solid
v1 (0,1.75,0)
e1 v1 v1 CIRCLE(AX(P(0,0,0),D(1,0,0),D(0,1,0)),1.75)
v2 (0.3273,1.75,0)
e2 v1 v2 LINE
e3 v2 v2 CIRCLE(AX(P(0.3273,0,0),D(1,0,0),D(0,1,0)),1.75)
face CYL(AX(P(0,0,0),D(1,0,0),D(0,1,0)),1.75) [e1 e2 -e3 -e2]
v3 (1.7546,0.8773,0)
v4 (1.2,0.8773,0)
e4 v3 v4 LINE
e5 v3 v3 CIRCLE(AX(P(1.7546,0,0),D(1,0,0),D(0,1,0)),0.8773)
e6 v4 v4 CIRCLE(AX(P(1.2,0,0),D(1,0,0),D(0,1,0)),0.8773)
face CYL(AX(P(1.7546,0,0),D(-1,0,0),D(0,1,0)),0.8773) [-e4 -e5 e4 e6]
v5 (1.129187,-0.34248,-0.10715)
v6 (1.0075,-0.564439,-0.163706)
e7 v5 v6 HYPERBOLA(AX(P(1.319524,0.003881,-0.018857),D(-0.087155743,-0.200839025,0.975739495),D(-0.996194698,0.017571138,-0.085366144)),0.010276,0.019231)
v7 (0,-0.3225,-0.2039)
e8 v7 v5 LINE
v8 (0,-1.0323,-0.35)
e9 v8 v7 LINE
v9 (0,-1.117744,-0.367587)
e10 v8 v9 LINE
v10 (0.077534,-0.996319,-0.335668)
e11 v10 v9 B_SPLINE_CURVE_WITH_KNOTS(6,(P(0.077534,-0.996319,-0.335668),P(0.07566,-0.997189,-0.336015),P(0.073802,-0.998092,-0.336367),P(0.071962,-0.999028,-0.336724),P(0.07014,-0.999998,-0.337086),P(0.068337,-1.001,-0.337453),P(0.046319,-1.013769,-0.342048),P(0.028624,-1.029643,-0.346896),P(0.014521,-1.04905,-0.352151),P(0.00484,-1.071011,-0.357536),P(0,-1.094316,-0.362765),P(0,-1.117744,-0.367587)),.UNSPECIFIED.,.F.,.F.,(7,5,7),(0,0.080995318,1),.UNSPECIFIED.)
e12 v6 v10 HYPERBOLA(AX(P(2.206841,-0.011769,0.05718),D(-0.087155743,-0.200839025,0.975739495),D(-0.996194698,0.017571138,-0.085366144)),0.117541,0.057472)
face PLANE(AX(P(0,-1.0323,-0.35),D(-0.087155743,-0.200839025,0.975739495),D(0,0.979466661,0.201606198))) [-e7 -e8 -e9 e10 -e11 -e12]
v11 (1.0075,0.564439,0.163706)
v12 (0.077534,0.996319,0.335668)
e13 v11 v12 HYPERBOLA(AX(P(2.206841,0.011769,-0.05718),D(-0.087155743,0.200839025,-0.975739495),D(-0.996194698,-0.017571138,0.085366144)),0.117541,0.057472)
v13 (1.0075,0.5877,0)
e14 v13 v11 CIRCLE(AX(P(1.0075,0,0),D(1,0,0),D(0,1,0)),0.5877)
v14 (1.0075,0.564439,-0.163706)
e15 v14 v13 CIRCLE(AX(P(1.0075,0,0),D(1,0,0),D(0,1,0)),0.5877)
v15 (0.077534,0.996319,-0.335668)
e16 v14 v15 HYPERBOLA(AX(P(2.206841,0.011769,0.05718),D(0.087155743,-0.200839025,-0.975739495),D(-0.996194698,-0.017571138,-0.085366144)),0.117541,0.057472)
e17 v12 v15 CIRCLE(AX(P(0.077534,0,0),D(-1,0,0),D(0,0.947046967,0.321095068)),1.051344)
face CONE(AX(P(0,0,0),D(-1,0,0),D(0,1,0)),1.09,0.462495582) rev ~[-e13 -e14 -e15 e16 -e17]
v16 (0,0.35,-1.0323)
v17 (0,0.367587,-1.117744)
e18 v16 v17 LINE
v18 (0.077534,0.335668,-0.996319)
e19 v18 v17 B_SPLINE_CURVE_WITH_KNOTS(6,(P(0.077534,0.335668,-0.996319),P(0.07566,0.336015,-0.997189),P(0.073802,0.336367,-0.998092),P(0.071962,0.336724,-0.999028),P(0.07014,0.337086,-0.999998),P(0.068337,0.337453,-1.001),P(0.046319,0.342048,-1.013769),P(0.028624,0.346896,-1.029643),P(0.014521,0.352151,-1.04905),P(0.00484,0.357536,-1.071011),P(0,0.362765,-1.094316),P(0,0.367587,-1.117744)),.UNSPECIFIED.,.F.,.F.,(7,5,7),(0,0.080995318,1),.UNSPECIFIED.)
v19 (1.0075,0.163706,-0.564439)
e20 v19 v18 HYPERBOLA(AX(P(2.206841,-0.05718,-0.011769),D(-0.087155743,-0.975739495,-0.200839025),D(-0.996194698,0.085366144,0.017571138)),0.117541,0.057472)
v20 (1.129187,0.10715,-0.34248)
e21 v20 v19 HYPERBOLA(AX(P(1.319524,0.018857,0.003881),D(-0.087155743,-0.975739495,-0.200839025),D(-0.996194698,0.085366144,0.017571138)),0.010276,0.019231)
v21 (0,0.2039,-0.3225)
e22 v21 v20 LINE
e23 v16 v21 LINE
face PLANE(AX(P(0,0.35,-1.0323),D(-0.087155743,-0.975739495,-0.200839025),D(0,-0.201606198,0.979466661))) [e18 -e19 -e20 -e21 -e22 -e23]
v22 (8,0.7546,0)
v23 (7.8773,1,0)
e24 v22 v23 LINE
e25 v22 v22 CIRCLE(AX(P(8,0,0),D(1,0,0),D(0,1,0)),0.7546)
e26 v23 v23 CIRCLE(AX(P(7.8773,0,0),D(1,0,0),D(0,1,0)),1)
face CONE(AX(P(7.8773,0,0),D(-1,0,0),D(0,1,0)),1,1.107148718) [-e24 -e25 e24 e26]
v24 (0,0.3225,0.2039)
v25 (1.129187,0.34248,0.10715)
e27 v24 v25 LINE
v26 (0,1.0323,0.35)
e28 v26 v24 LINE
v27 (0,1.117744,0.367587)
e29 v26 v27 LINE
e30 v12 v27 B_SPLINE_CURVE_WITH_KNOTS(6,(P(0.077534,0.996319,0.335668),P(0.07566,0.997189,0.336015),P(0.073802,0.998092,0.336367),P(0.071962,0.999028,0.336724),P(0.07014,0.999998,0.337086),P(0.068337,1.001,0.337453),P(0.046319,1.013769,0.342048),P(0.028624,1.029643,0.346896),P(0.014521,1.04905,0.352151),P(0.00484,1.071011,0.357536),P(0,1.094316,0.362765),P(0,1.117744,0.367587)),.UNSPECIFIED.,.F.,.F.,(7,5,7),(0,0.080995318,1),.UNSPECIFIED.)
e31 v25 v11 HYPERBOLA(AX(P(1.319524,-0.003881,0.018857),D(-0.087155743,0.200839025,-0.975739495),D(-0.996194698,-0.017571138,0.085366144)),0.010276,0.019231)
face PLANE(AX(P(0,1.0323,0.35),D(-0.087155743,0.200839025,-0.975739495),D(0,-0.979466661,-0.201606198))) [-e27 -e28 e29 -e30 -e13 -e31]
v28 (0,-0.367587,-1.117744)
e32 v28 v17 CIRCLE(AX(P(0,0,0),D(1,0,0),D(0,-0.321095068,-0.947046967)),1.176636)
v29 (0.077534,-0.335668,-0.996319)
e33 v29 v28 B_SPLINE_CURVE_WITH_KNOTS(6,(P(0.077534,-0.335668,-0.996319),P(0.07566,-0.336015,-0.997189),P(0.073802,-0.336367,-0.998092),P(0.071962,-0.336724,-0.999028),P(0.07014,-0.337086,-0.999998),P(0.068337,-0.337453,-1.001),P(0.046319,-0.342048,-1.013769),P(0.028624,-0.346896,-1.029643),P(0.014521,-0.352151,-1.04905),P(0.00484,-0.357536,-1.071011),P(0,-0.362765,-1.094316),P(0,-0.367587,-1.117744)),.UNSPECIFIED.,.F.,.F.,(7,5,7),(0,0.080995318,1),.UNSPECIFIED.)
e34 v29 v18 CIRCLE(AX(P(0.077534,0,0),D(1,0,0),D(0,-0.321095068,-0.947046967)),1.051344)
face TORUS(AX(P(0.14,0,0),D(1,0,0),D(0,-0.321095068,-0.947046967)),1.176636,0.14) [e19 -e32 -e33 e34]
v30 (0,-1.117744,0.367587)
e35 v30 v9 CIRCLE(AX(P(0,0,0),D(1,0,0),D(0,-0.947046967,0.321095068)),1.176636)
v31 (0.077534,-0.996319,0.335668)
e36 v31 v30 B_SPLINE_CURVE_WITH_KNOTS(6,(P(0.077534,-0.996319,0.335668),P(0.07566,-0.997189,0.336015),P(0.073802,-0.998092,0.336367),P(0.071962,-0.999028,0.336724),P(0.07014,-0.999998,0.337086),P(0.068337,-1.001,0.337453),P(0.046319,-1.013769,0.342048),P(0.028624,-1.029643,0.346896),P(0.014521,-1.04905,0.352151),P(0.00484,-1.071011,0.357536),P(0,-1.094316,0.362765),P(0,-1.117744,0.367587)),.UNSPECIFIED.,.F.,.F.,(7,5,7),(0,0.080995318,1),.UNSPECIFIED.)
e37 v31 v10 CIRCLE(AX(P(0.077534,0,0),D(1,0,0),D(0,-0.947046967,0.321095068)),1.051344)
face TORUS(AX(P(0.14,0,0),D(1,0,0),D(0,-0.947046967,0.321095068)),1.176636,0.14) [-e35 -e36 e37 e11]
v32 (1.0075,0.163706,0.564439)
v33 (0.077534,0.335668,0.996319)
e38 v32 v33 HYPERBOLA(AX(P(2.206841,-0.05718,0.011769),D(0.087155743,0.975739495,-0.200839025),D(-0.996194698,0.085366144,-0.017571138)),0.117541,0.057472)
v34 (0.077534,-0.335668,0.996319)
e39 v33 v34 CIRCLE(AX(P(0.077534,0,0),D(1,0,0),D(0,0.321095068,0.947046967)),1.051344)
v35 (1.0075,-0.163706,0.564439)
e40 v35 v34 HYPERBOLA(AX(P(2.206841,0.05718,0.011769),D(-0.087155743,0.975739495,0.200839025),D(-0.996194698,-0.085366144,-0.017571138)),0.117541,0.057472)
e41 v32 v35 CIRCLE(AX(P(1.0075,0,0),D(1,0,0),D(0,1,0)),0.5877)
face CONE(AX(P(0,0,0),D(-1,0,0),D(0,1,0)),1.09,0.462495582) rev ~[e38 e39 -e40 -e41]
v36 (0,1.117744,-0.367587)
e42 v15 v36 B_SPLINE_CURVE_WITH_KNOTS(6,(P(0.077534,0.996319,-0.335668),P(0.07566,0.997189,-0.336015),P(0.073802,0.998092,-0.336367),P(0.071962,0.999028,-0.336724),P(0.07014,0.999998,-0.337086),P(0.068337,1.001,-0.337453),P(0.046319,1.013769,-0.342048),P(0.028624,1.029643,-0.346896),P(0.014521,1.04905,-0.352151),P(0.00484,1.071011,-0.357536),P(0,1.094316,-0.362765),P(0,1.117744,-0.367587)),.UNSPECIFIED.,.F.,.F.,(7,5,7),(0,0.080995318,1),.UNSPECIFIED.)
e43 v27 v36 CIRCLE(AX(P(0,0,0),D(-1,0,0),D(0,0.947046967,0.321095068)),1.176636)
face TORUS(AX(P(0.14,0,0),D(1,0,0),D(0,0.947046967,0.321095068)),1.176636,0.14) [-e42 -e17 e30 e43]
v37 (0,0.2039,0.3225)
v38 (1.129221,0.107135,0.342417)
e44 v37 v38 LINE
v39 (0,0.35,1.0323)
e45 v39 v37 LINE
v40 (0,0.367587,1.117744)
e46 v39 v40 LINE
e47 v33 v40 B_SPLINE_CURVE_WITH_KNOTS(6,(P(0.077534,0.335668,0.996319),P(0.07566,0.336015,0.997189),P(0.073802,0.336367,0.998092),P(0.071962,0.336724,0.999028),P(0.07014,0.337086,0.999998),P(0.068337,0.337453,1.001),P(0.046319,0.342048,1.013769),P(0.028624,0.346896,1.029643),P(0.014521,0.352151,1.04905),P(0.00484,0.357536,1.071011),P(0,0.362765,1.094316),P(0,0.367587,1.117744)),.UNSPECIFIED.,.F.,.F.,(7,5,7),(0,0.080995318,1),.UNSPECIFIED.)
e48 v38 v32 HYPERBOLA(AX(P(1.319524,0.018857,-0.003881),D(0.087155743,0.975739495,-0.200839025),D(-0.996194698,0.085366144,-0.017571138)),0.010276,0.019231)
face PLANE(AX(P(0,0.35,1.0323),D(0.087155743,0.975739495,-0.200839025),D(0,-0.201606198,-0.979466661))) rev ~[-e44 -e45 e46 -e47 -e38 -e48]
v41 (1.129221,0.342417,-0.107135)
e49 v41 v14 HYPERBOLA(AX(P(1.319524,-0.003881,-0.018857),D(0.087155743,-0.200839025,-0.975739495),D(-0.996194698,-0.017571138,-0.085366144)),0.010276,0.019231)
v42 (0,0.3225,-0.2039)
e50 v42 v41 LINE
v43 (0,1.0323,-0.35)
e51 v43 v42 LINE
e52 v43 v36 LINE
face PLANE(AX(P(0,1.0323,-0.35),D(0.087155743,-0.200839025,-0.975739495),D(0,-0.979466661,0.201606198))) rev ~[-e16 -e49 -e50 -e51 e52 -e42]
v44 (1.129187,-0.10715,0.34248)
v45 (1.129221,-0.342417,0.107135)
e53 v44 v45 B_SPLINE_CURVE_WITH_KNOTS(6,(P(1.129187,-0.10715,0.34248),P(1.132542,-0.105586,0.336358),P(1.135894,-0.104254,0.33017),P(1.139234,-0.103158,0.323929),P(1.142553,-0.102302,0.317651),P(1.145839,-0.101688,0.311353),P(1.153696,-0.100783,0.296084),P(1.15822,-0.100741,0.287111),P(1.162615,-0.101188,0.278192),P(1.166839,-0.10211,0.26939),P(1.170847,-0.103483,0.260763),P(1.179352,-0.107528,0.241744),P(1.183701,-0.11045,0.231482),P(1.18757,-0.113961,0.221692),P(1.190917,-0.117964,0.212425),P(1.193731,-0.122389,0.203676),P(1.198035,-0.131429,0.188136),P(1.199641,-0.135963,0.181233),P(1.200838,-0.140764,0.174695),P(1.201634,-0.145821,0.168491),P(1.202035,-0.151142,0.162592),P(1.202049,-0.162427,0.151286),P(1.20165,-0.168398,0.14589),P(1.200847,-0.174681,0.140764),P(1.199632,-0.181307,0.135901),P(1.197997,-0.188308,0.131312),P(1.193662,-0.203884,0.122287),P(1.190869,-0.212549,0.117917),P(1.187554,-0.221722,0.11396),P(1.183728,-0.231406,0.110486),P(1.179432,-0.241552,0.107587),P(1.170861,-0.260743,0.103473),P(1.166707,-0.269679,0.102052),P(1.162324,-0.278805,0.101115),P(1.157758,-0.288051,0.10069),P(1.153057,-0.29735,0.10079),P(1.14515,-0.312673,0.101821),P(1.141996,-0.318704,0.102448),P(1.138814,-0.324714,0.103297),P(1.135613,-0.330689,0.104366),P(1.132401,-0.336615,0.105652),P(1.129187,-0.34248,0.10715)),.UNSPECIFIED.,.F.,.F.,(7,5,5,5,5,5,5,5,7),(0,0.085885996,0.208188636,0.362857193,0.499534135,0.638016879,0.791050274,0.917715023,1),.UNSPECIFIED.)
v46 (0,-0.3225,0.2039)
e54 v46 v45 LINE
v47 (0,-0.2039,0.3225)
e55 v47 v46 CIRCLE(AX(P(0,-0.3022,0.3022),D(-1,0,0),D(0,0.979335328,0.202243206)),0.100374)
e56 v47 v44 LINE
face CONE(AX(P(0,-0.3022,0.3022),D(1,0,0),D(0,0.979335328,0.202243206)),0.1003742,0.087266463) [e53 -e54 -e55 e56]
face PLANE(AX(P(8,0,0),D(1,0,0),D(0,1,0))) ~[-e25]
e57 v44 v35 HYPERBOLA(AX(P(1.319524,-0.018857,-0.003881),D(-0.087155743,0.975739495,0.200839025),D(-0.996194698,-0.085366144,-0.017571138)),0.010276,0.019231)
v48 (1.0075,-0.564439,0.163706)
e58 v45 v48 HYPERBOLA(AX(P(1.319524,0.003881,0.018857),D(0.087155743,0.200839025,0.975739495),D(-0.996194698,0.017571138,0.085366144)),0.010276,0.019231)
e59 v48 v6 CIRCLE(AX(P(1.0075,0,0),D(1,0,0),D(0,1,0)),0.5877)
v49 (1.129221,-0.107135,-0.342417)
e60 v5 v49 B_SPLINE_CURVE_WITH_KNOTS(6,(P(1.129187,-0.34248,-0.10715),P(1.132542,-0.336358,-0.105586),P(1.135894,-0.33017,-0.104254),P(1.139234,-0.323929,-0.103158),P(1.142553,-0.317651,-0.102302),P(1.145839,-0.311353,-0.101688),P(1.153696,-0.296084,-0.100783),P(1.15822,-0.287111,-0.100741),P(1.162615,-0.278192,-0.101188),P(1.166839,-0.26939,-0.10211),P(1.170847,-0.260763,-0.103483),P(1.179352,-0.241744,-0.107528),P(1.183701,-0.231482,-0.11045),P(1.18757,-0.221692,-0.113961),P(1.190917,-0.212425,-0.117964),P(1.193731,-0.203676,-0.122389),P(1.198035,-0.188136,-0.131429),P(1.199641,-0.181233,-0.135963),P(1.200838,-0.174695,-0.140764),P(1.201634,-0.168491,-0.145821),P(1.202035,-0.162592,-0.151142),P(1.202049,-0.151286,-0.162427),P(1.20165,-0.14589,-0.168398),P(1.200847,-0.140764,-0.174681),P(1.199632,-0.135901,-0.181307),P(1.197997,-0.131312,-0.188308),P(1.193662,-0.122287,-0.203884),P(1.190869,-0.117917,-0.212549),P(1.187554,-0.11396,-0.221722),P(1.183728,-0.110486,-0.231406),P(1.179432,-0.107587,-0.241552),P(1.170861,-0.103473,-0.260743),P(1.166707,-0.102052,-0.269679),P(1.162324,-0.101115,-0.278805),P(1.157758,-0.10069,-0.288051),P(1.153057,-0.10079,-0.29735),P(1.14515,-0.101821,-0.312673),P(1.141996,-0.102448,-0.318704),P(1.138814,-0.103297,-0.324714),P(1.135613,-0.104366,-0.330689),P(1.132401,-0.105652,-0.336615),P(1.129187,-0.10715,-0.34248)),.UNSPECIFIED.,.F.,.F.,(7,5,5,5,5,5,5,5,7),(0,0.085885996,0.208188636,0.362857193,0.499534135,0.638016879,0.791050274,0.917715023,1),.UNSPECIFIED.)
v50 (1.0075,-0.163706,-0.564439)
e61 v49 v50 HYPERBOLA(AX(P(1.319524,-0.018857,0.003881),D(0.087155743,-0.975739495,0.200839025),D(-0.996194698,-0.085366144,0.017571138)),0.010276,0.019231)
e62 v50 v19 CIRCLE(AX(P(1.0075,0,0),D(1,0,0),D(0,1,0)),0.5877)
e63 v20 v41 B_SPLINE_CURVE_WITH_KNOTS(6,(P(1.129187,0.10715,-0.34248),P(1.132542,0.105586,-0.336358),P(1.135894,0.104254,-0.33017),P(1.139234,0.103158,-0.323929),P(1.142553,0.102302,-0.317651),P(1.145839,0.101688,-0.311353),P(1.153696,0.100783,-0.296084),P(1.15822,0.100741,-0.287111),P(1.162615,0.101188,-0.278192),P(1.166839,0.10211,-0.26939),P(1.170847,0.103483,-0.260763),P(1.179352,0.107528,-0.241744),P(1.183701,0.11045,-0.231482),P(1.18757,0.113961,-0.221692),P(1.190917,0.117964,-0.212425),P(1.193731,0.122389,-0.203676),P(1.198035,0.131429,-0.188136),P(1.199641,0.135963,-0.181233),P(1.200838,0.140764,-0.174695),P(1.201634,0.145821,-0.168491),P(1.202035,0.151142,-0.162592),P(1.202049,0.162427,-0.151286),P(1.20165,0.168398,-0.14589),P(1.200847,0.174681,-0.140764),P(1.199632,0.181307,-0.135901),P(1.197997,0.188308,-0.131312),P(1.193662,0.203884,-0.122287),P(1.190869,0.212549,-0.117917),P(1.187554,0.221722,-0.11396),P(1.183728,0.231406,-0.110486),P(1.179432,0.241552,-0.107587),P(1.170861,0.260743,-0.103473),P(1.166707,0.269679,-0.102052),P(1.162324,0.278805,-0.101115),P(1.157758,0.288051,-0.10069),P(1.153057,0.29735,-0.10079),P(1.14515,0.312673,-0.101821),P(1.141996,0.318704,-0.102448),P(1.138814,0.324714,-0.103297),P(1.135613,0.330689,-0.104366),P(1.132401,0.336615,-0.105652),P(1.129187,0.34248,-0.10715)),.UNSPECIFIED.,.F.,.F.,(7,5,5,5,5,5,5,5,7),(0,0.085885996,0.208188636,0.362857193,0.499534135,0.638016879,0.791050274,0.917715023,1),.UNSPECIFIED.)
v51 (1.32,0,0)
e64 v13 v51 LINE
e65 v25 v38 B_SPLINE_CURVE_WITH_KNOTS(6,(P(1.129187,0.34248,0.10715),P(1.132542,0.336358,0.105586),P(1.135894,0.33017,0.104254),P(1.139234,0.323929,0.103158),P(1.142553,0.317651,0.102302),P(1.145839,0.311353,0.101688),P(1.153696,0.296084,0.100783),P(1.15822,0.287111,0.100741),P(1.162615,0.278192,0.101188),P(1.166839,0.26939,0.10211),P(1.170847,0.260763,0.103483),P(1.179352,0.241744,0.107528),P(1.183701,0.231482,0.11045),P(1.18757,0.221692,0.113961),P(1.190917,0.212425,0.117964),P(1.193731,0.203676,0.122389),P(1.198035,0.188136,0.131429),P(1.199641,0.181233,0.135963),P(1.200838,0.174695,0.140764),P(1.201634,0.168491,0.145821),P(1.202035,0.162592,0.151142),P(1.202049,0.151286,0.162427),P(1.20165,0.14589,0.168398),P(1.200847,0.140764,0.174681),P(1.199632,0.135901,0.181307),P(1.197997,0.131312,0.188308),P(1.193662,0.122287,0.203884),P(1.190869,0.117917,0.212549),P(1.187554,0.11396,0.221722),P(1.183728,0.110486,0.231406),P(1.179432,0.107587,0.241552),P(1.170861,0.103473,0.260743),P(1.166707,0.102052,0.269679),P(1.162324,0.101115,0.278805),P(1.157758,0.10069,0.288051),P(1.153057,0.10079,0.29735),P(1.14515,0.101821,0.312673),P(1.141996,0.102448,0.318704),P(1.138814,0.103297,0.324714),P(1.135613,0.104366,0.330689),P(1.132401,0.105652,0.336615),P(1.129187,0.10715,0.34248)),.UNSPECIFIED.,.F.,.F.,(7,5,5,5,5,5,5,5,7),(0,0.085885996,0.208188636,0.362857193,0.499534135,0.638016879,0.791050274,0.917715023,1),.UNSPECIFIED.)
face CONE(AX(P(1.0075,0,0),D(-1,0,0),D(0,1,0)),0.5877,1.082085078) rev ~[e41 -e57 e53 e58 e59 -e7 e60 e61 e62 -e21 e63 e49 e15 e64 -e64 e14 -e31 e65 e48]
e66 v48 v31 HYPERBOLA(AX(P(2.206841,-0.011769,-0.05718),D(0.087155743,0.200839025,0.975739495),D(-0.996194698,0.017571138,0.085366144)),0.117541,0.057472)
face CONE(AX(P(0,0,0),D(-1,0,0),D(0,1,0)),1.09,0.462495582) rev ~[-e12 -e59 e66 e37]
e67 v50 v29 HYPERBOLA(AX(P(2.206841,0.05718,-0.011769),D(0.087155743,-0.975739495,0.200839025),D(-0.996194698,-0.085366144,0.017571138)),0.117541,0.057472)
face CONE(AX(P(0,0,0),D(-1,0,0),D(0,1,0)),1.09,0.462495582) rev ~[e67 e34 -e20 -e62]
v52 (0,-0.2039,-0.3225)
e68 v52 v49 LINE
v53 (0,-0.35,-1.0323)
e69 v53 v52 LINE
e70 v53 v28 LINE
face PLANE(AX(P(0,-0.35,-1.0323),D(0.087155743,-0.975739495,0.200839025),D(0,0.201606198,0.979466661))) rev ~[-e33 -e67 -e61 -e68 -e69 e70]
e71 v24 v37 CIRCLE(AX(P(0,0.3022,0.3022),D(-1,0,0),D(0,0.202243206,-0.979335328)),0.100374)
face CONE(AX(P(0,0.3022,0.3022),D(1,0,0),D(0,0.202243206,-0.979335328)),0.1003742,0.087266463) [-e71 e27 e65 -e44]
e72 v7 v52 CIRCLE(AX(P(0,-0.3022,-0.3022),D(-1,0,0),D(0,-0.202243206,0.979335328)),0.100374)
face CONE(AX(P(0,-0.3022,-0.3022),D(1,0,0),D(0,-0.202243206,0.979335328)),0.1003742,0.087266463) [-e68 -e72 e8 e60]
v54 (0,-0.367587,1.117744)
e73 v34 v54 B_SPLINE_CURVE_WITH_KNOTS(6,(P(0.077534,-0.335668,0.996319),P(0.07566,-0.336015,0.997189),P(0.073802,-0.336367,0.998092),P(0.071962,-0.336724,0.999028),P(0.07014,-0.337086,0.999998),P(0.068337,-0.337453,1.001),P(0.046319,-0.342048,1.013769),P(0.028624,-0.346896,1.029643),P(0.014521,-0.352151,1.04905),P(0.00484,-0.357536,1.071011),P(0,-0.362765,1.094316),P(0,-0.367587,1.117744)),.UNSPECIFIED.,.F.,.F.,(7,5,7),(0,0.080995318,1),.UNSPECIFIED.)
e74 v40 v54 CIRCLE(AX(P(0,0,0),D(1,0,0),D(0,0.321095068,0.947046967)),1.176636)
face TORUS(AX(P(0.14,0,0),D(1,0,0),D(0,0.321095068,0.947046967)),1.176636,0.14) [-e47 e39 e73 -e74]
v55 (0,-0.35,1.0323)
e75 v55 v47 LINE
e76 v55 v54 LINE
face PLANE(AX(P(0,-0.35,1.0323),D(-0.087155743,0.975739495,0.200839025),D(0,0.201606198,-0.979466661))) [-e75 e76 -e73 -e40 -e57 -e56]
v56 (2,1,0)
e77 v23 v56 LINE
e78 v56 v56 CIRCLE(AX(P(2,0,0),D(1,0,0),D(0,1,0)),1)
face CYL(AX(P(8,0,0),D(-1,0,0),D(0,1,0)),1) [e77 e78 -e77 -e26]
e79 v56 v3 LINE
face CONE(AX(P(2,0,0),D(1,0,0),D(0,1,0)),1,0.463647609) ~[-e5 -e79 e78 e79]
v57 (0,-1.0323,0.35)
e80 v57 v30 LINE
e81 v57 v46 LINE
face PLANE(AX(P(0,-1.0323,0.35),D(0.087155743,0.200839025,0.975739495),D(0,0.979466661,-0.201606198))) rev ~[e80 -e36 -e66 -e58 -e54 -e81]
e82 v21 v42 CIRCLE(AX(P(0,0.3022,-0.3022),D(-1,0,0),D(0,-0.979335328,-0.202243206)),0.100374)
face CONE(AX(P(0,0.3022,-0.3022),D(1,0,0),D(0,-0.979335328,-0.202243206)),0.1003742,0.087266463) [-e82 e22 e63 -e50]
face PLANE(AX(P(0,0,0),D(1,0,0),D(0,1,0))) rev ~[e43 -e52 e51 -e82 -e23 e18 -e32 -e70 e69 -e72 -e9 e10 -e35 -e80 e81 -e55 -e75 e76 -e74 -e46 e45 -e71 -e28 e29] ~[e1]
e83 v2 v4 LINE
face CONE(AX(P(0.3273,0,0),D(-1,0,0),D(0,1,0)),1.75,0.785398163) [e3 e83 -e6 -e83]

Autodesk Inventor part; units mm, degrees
ref_plane "YZ Plane" through (0, 0, 0) normal (1, 0, 0) x (0, 1, 0)
ref_plane "XZ Plane" through (0, 0, 0) normal (0, 1, 0) x (-1, 0, 0)
sketch "Sketch1" plane through (0, 0, 0) normal (0, 0, 1) x (1, 0, 0)
  line L0 (1.32, 0) -> (8, 0)
  line L1 (8, 0) -> (8, 1)
  line L2 (8, 1) -> (2, 1)
  line L3 (2, 1) -> (1.7546, 0.8773)
  line L4 (1.7546, 0.8773) -> (1.2, 0.8773)
  line L5 (0, 1.75) -> (0, 1.09)
  line L6 (0, 1.09) -> (1.0075, 0.5877)
  line L7 (1.0075, 0.5877) -> (1.32, 0)
  line L8 (-1.6, 0) -> (9.6, 0) projected
  line L9 (0, -0.35) -> (0, 2.1) projected
  line L10 (0, 1.75) -> (0.3273, 1.75)
  line L11 (0.3273, 1.75) -> (1.2, 0.8773)
  line L12 (2, 1) -> (1.0773, 1) construction
  dimension "d1" = 6
  dimension "d2" = 2
  dimension "d3" = 1.7546
  dimension "d4" = 2.18
  dimension "d5" = 26.5
  dimension "d6" = 62
  dimension "d7" = 1.32
  dimension "d8" = 0.2454
  dimension "d12" = 3.5
  dimension "d13" = 45
  dimension "d15" = 8
  dimension "d24" = 1.2
revolve "Body" add sketch "Sketch1" angle 360 about axis through (1.32, 0, 0) along (1, 0, 0) contours L7 L6 L5 L10 L11 L4 L3 L2 L1 L0
sketch "Sketch2" plane through (0, 0, 0) normal (-1, 0, 0) x (0, 0, 1)
  line L0 (0, 1.09) -> (0, 0) construction
  line L1 (0, 0) -> (1.09, 0) construction
  arc A0 (0.327, 0) -> (0, 0.327) centre (0, 0) ccw construction
  arc A1 (0.3815, 0) -> (0, 0.3815) centre (0, 0) ccw construction
  arc A2 (1.0323, 0.35) -> (0.35, 1.0323) centre (0, 0) ccw
  line L2 (0, 0) -> (0.7707, 0.7707) construction
  line L3 (0.35, 1.0323) -> (0.2039, 0.3225)
  line L4 (1.0323, 0.35) -> (0.3225, 0.2039)
  arc A3 (0.35, 1.0323) -> (0, 1.09) centre (0, 0) ccw
  arc A4 (1.09, 0) -> (1.0323, 0.35) centre (0, 0) ccw
  line L5 (0, -2.45) -> (0, 2.45) projected
  line L6 (-2.45, 0) -> (2.45, 0) projected
  arc A5 (0.35, -1.0323) -> (1.0323, -0.35) centre (0, 0) ccw
  line L7 (0.35, -1.0323) -> (0.2039, -0.3225)
  line L8 (1.0323, -0.35) -> (0.3225, -0.2039)
  arc A6 (0, -1.09) -> (0.35, -1.0323) centre (0, 0) ccw
  arc A7 (1.0323, -0.35) -> (1.09, 0) centre (0, 0) ccw
  arc A8 (-0.35, 1.0323) -> (-1.0323, 0.35) centre (0, 0) ccw
  line L9 (-0.35, 1.0323) -> (-0.2039, 0.3225)
  line L10 (-1.0323, 0.35) -> (-0.3225, 0.2039)
  arc A9 (0, 1.09) -> (-0.35, 1.0323) centre (0, 0) ccw
  arc A10 (-1.0323, 0.35) -> (-1.09, 0) centre (0, 0) ccw
  arc A11 (-0.35, -1.0323) -> (0, -1.09) centre (0, 0) ccw
  arc A12 (-1.0323, -0.35) -> (-0.35, -1.0323) centre (0, 0) ccw
  arc A13 (-1.09, 0) -> (-1.0323, -0.35) centre (0, 0) ccw
  line L11 (-1.0323, -0.35) -> (-0.3225, -0.2039)
  line L12 (-0.35, -1.0323) -> (-0.2039, -0.3225)
  arc A14 (0.2039, 0.3225) -> (0.3225, 0.2039) centre (0.3022, 0.3022) ccw
  arc A15 (0.3225, -0.2039) -> (0.2039, -0.3225) centre (0.3022, -0.3022) ccw
  arc A16 (-0.3225, 0.2039) -> (-0.2039, 0.3225) centre (-0.3022, 0.3022) ccw
  arc A17 (-0.2039, -0.3225) -> (-0.3225, -0.2039) centre (-0.3022, -0.3022) ccw
  point P0 (0.7707, -0.7707)
  point P1 (-0.7707, 0.7707)
  point P2 (-0.7707, -0.7707)
  dimension "d17" = 0.654
  dimension "d18" = 0.763
  dimension "d19" = 2.18
  dimension "d20" = 45
  dimension "d21" = 0.35
extrude "Slot" add sketch "Sketch2" against normal up to next draft 5 contours L4 A14 L3 A2 | A5 L7 A15 L8 | L9 A16 L10 A8 | A12 L11 A17 L12
fillet "Fillet1" radius 0.14 4 edges at (0, 1.09, 0) (0, 0, -1.09) (0, -1.09, 0) (0, 0, 1.09)
thread "Thread" size "M2x0.4" class "6g" standard "ISO Metric profile" length 6
chamfer "Chamfer1" distance 0.2454 distance2 0.1227 1 edges at (8, -1, 0) measured on face at (8, -0.1182, -0.3117)
ref_plane "Work Plane2" through (3.35, 0, 0) normal (0, 0, -1) x (1, 0, 0)
equation "\"d1\" = GEL"
equation "\"d2\" = GD"
equation "\"d3\" = BDM"
equation "\"d4\" = SDM"
equation "\"d7\" = INTI"
equation "\"d8\" = GAL"
equation "\"d12\" = KOD"
equation "\"d13\" = 0.5 * SEWI"
equation "\"d15\" = NLG"
equation "\"d24\" = KOH"
equation "\"d17\" = 0.3 * SDM"
equation "\"d18\" = 0.35 * SDM"
equation "\"d19\" = SDM"
equation "\"d21\" = 0.5 * SBR"
equation "\"d23\" = 0.2 * SBR"
equation "\"d10\" = GEL"
equation "\"d25\" = -0.5 * SPD + 0.5 * GD"
equation "\"d26\" = 0.5 * GAL"
equation "\"NLG\" = 8"
equation "\"GEL\" = 6"
equation "\"GAL\" = 0.61345 * PTC"
equation "\"SPD\" = NND - 1.2269 * PTC"
equation "\"KOD\" = 3.5"
equation "\"KOH\" = 1.2"
equation "\"SBR\" = 0.7"
equation "\"INTI\" = 1.32"
equation "\"SDM\" = 2.18"
equation "\"GD\" = NND"
equation "\"BDM\" = NND - GAL"
equation "\"SEWI\" = 90deg"
equation "\"d9\" = SDM"
equation "\"GUL\" = 0.61345 * PTC"
equation "\"TOA\" = 30deg"
equation "\"EPV\" = 2.2"
equation "\"THREADDIA\" = 2"
equation "\"RR\" = 0.2"
equation "\"PTC\" = 0.4"
equation "\"NND\" = 2"
equation "\"GD1\" = THREADDIA - 1.2269 * PTC"
properties part number "AS 1427 - M2 x 8(5)" material "Steel, Mild"
